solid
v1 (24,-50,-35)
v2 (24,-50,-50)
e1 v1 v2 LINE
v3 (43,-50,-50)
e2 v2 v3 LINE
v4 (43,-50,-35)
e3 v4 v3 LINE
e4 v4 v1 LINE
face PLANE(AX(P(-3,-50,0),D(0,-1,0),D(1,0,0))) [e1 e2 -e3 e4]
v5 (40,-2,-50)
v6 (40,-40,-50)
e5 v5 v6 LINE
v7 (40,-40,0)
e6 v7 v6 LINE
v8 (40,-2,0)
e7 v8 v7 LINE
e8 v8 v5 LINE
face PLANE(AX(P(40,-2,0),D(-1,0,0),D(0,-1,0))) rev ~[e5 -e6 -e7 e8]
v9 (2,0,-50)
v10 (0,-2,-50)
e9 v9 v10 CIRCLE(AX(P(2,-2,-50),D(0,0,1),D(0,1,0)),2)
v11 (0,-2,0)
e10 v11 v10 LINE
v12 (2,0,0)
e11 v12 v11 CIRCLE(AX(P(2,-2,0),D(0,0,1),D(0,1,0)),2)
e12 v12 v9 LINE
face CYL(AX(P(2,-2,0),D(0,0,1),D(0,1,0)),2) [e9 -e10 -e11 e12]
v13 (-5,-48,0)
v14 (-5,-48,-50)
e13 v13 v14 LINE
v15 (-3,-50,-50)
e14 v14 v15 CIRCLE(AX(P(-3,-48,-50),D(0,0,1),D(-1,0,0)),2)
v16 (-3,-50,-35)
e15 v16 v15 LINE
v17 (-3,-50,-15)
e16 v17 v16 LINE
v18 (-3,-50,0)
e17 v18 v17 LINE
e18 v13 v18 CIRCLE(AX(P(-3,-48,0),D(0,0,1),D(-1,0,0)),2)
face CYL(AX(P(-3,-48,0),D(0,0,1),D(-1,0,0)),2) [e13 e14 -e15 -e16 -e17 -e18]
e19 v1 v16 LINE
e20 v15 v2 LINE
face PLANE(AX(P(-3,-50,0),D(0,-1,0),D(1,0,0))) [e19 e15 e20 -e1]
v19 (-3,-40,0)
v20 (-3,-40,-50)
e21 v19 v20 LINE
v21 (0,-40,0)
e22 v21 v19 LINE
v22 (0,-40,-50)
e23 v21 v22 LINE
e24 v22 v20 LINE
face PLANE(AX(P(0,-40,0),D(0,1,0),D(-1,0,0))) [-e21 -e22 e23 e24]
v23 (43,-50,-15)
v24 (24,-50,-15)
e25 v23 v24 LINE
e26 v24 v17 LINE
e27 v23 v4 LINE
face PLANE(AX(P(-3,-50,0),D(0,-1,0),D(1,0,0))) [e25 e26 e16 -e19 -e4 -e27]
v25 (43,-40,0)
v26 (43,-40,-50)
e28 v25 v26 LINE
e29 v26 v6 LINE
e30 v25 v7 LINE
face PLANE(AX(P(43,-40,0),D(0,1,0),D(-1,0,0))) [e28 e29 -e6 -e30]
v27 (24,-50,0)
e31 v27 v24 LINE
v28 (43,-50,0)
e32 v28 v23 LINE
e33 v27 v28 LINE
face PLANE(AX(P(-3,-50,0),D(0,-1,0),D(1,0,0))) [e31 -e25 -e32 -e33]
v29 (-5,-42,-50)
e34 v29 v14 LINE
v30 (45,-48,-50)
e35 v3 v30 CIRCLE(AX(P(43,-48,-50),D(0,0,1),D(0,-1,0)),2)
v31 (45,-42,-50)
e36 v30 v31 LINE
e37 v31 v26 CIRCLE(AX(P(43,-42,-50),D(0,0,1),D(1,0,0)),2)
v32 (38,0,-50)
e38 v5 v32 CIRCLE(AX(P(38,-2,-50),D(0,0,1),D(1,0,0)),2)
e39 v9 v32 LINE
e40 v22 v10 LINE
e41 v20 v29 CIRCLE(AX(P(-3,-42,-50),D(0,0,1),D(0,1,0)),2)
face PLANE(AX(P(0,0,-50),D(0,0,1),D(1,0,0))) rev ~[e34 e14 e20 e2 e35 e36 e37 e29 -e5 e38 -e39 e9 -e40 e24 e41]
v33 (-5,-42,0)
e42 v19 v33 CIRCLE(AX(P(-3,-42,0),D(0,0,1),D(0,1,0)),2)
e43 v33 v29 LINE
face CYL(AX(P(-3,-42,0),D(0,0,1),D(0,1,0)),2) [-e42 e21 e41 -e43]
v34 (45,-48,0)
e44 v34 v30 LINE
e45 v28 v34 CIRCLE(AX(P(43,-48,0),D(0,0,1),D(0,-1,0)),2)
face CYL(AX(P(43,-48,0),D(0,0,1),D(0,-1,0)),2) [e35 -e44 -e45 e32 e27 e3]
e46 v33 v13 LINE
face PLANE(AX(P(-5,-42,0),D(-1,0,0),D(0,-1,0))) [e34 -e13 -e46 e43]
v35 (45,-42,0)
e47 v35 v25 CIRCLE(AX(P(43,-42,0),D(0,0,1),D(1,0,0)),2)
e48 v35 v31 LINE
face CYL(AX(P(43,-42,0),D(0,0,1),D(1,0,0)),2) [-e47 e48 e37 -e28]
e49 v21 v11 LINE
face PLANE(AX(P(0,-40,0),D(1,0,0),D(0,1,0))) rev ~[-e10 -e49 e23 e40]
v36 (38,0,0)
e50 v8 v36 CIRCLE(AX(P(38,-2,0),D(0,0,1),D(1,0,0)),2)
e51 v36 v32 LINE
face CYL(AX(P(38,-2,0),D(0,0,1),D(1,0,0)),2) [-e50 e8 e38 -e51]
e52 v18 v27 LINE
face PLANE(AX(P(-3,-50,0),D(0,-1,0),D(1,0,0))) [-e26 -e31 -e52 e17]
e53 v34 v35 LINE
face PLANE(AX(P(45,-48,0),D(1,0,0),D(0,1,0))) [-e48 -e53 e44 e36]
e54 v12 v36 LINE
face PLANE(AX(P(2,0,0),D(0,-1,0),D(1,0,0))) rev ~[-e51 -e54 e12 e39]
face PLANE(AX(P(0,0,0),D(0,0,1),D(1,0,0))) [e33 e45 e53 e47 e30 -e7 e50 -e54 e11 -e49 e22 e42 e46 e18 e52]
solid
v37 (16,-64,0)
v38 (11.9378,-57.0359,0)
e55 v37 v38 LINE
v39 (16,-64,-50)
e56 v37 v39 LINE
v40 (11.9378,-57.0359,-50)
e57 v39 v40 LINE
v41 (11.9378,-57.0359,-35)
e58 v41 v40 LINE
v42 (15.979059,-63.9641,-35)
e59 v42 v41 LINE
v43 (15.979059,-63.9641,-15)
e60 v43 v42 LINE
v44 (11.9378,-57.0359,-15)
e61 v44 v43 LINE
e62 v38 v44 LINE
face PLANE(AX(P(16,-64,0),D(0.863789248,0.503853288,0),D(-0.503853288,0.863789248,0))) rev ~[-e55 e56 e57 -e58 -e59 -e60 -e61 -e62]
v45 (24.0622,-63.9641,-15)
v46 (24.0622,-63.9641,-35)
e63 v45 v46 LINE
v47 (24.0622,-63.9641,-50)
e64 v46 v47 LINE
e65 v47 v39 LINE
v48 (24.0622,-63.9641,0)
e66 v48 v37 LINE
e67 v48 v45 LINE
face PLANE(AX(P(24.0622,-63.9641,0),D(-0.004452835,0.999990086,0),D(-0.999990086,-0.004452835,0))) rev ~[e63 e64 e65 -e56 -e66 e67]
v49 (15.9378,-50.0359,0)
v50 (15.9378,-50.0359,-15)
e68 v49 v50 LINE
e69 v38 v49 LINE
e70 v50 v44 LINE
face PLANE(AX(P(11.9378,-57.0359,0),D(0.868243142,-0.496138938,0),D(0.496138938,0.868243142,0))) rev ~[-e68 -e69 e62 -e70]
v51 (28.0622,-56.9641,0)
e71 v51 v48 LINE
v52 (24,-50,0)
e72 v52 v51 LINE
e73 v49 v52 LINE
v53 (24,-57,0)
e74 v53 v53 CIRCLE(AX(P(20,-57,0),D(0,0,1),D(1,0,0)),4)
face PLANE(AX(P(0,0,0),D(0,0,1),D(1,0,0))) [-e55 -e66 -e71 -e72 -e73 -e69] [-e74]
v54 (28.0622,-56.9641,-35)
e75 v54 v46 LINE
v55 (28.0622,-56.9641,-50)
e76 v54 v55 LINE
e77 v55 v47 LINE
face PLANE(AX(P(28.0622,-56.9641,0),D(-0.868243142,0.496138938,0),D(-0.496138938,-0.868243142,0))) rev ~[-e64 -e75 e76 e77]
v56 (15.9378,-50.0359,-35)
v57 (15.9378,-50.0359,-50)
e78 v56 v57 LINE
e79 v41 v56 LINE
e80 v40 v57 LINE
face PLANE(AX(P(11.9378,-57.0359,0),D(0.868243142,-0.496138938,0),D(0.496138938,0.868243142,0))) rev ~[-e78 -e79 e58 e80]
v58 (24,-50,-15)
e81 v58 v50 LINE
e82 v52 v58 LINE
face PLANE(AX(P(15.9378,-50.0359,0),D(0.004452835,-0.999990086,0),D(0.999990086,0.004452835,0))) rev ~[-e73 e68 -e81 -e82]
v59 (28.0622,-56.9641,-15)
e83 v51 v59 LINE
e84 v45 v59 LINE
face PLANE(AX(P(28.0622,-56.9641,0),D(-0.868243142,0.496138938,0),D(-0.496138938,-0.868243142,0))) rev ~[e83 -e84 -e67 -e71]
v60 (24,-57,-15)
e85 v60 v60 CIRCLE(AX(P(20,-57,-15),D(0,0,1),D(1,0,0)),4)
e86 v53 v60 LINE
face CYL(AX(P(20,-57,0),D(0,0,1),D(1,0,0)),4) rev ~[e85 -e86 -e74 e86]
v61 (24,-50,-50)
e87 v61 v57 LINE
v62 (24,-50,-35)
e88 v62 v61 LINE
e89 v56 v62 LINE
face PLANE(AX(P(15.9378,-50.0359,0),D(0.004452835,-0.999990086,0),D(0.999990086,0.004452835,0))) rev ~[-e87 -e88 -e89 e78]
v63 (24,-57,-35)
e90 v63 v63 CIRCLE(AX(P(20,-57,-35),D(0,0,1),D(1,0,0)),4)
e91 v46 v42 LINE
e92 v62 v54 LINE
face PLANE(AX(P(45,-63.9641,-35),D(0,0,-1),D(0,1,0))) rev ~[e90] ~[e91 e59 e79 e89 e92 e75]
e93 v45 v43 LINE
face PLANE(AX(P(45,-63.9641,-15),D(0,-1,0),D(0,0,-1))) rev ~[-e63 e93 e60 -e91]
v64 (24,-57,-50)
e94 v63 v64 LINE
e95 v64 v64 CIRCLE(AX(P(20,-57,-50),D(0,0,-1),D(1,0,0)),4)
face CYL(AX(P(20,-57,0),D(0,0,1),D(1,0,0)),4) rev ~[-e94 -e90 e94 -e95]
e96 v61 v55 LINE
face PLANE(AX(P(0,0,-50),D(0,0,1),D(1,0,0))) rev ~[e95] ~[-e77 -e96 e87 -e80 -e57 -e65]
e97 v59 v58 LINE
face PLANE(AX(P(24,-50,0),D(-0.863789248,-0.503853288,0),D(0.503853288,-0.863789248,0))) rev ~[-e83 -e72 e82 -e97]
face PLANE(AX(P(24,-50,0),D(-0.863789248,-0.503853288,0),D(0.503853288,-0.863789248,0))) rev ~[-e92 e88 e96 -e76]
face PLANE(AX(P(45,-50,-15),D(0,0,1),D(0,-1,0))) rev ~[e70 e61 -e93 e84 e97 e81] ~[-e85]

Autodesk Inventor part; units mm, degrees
ref_plane "YZ Plane" through (0, 0, 0) normal (1, 0, 0) x (0, 1, 0)
ref_plane "XZ Plane" through (0, 0, 0) normal (0, 1, 0) x (-1, 0, 0)
ref_plane "XY Plane" through (0, 0, 0) normal (0, 0, 1) x (1, 0, 0)
sketch "Sketch1" plane through (0, 0, 0) normal (0, 0, 1) x (1, 0, 0)
  line L0 (2, 0) -> (38, 0)
  line L1 (40, -2) -> (40, -40)
  line L2 (40, -40) -> (0, -40)
  line L3 (0, -40) -> (0, -2)
  line L4 (0, -40) -> (-3, -40)
  line L5 (-5, -42) -> (-5, -48)
  line L6 (-3, -50) -> (43, -50)
  line L7 (45, -48) -> (45, -42)
  line L8 (43, -40) -> (40, -40)
  arc A0 (2, 0) -> (0, -2) centre (2, -2) ccw
  arc A1 (40, -2) -> (38, 0) centre (38, -2) ccw
  arc A2 (-3, -40) -> (-5, -42) centre (-3, -42) ccw
  arc A3 (-5, -48) -> (-3, -50) centre (-3, -48) ccw
  arc A4 (45, -42) -> (43, -40) centre (43, -42) ccw
  arc A5 (43, -50) -> (45, -48) centre (43, -48) ccw
  point P0 (0, 0)
  point P1 (40, 0)
  point P2 (-5, -40)
  point P3 (-5, -50)
  point P4 (45, -50)
  point P5 (45, -40)
  dimension "d0" = 40
  dimension "d1" = 40
  dimension "d2" = 5
  dimension "d3" = 10
  dimension "d4" = 50
  dimension "d5" = 2
  dimension "d6" = 2
extrude "Extrusion1" add sketch "Sketch1" against normal blind 50
sketch "Sketch2" plane through (0, 0, 0) normal (0, 0, 1) x (1, 0, 0)
  line L0 (43, -50) -> (-3, -50) projected
  line L1 (20, -50) -> (20, -57)
  line L2 (-3, -50) -> (43, -50) projected
  circle A0 centre (20, -57) radius 4
  line L3 (24, -50) -> (28.0622, -56.9641)
  line L4 (28.0622, -56.9641) -> (24.0622, -63.9641)
  line L5 (24.0622, -63.9641) -> (16, -64)
  line L6 (16, -64) -> (11.9378, -57.0359)
  line L7 (11.9378, -57.0359) -> (15.9378, -50.0359)
  line L8 (15.9378, -50.0359) -> (24, -50)
  point P0 (0, 0)
  dimension "d9" = 7
  dimension "d10" = 8
extrude "Extrusion2" add sketch "Sketch2" against normal blind 50 contours L3 L4 L5 L6 L7 L8
sketch "Sketch3" plane through (45, -48, 0) normal (1, 0, 0) x (0, 0, -1)
  line L0 (0, 0) -> (0, -2) projected
  line L1 (0, -2) -> (15, -2)
  line L2 (0, -2) -> (50, -2) projected
  line L3 (15, -2) -> (15, -15.9641)
  line L4 (0, -15.9641) -> (50, -15.9641) projected
  line L5 (15, -15.9641) -> (35, -15.9641)
  line L6 (35, -15.9641) -> (35, -2)
  line L7 (15, -2) -> (35, -2)
  point P0 (0, 48)
  dimension "d13" = 15
  dimension "d14" = 20
extrude "Extrusion3" cut sketch "Sketch3" against normal blind 50
ref_plane "Work Plane1" through (0, 0, -25) normal (0, 0, -1) x (-1, 0, 0)
thread "Thread1" size "M8x1.25" class "6H" standard "ANSI Metric M Profile" full length
thread "Thread2" size "M8x1.25" class "6H" standard "ANSI Metric M Profile" full length
properties part number "mass"
